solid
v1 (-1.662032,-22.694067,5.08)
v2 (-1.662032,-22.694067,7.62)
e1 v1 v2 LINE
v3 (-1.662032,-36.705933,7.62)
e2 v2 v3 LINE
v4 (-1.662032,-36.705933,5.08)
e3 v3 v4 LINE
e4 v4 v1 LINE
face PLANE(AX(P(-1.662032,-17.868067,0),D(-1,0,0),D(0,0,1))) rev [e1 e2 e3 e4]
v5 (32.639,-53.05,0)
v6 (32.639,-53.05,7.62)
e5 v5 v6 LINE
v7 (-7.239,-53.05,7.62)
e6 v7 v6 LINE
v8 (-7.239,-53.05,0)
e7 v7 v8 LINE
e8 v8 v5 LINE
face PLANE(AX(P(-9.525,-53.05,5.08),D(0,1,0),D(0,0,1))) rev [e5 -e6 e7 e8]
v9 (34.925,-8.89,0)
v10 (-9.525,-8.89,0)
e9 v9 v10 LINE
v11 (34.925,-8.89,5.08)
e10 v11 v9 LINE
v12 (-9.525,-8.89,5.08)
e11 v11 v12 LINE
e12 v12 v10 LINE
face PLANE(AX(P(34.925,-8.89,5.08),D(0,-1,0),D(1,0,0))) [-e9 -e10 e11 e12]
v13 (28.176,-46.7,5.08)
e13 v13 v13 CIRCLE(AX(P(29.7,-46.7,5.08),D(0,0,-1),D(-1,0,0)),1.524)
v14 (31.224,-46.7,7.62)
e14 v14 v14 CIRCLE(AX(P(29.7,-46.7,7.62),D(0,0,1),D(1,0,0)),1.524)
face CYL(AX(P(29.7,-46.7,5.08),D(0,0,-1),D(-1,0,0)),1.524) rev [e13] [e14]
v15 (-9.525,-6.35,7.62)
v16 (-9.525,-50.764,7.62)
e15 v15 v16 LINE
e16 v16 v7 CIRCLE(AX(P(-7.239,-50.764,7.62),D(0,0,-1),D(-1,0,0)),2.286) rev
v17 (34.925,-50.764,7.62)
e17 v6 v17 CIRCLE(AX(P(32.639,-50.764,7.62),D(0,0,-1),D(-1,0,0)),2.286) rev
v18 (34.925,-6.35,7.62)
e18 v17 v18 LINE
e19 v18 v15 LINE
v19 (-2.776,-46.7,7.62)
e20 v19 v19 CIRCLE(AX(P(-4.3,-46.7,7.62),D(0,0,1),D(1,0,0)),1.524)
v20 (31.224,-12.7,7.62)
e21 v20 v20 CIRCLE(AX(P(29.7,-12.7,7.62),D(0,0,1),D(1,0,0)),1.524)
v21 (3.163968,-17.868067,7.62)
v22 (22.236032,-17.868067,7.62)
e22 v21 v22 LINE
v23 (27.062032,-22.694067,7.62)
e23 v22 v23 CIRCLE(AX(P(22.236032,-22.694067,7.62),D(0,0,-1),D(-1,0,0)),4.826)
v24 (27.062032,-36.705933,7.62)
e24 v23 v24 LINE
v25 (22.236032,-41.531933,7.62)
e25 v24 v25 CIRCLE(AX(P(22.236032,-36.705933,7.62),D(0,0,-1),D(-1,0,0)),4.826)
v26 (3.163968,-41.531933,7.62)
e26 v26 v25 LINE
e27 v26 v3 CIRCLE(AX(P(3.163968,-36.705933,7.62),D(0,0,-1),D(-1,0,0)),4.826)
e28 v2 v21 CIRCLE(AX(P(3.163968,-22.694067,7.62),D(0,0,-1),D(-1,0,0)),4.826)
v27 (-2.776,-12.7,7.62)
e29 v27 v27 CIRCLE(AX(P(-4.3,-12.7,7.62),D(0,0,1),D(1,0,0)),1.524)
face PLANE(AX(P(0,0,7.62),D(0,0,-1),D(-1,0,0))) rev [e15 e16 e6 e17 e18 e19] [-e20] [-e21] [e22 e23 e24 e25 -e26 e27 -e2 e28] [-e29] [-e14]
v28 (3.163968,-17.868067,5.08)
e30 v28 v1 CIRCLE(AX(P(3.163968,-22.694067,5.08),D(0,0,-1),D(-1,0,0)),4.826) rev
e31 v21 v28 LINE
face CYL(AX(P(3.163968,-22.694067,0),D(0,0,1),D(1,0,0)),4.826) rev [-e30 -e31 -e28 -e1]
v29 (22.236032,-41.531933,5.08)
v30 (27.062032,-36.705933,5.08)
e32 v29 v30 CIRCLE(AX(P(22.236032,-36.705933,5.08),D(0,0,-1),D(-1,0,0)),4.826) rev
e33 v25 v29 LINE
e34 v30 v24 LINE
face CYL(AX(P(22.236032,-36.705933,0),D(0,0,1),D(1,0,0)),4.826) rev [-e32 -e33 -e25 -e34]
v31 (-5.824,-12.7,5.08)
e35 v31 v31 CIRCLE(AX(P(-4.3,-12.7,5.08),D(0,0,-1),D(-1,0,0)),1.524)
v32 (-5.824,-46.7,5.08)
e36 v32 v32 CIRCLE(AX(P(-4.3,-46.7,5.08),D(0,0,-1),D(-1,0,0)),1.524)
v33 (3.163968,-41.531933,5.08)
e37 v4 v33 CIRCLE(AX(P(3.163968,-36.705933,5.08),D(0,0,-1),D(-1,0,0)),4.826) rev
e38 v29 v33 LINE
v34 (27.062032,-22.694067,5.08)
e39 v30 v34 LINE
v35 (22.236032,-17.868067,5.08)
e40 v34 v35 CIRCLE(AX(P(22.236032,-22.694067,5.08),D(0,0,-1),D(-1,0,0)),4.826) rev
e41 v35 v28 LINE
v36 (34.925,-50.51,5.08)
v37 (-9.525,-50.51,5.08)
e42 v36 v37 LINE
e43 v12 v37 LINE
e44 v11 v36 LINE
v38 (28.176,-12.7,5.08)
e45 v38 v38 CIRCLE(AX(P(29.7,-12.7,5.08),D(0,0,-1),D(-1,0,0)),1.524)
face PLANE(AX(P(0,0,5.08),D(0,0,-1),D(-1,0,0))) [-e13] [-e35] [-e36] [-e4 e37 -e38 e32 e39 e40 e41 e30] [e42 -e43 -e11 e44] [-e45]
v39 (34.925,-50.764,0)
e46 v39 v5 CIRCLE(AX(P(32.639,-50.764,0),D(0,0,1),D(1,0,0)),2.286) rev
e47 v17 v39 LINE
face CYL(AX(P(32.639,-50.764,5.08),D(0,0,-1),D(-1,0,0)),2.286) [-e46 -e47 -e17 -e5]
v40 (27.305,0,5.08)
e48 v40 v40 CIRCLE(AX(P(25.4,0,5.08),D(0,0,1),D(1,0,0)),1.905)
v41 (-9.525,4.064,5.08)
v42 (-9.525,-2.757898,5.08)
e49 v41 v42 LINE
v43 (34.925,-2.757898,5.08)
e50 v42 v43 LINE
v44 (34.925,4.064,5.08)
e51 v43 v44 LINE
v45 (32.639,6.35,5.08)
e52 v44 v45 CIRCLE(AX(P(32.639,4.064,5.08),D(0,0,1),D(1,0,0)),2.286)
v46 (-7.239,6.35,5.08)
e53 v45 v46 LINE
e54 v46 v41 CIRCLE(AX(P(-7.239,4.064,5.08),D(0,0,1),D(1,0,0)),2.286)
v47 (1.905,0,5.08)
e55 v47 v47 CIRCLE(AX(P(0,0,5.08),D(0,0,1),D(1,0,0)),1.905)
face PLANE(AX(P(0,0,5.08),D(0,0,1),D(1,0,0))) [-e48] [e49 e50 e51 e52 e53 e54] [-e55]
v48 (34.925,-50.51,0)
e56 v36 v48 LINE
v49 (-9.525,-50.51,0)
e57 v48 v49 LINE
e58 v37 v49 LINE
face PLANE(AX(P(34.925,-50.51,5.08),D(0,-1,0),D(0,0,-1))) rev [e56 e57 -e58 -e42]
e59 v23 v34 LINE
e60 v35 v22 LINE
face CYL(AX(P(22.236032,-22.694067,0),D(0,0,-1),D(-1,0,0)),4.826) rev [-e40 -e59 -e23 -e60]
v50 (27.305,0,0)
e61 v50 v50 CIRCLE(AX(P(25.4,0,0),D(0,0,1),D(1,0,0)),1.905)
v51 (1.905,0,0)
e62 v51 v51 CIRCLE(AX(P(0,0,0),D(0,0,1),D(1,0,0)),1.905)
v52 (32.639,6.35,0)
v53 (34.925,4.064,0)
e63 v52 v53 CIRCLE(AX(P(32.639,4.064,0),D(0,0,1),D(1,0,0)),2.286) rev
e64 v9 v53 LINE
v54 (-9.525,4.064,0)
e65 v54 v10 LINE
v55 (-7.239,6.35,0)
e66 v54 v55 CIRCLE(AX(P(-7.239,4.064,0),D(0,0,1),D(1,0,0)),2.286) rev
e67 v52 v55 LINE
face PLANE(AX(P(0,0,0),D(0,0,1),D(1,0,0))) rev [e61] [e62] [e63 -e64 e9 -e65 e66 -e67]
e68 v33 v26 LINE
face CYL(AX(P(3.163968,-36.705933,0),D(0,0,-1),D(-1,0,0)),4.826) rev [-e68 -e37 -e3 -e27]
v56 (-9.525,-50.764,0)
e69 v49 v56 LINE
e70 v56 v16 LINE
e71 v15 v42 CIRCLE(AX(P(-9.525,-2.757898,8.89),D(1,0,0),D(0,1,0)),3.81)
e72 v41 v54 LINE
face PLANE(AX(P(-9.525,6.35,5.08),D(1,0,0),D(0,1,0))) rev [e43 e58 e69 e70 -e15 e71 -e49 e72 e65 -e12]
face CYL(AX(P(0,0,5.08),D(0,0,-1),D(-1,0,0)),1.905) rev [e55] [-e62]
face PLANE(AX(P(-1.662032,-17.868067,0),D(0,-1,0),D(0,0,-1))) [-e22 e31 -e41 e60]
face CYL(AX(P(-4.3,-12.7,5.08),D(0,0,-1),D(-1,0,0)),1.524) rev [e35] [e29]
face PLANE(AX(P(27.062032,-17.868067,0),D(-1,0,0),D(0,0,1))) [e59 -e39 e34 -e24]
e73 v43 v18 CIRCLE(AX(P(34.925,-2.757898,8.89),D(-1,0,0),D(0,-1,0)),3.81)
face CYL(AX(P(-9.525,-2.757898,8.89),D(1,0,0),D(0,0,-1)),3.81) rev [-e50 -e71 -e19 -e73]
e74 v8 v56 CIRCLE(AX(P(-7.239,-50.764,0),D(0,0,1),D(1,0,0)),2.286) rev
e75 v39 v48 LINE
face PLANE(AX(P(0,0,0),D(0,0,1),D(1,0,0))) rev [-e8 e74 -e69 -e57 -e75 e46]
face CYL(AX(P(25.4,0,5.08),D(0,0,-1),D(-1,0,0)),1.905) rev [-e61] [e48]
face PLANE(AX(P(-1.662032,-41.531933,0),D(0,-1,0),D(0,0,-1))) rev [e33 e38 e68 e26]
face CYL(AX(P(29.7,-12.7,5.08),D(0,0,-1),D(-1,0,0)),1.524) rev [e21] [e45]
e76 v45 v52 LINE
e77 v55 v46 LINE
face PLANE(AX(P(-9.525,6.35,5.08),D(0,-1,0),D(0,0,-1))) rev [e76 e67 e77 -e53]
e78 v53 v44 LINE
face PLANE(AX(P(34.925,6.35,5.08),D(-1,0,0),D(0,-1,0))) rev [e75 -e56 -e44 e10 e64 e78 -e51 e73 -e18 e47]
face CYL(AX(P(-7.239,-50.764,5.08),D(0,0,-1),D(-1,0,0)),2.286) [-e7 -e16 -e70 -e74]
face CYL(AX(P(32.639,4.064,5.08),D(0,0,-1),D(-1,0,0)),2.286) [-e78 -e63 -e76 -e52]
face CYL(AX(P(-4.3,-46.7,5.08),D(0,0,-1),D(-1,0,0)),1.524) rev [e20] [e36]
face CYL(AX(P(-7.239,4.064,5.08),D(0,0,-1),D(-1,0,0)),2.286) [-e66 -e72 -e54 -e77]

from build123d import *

# Parameters (mm, degrees)
SKETCH1_W           = 44.45
SKETCH1_H           = 59.4
SKETCH1_R           = 1.905
SKETCH1_R_2         = 1.524
BOSS_EXTRUDE1_DEPTH = 5.08
SKETCH2_W           = 44.45
SKETCH2_H           = 46.7
SKETCH2_R           = 1.524
BOSS_EXTRUDE2_DEPTH = 2.54
SKETCH3_W           = 44.45
SKETCH3_H           = 41.62
CUT_EXTRUDE1_DEPTH  = 5.08
FILLET2_R           = 2.286
SKETCH4_W           = 28.72406321
SKETCH4_H           = 23.663865546
CUT_EXTRUDE2_DEPTH  = 64.969700054
FILLET3_R           = 4.826
FILLET4_R           = 3.81


with BuildPart() as part:
    # Sketch1 → Boss-Extrude1 (new body)
    with BuildSketch(Plane.XY):
        with Locations((12.7, -23.35)):
            Rectangle(SKETCH1_W, SKETCH1_H)
        Circle(SKETCH1_R, mode=Mode.SUBTRACT)
        with Locations((25.4, 0)):
            Circle(SKETCH1_R, mode=Mode.SUBTRACT)
        with Locations((-4.3, -12.7)):
            Circle(SKETCH1_R_2, mode=Mode.SUBTRACT)
        with Locations((29.7, -12.7)):
            Circle(SKETCH1_R_2, mode=Mode.SUBTRACT)
        with Locations((29.7, -46.7)):
            Circle(SKETCH1_R_2, mode=Mode.SUBTRACT)
        with Locations((-4.3, -46.7)):
            Circle(SKETCH1_R_2, mode=Mode.SUBTRACT)
    extrude(amount=BOSS_EXTRUDE1_DEPTH)

    # Sketch2 → Boss-Extrude2 (add)
    with BuildSketch(Plane.XY.offset(5.08)):
        with Locations((12.7, -29.7)):
            Rectangle(SKETCH2_W, SKETCH2_H)
        with Locations((-4.3, -12.7)):
            Circle(SKETCH2_R, mode=Mode.SUBTRACT)
        with Locations((-4.3, -46.7)):
            Circle(SKETCH2_R, mode=Mode.SUBTRACT)
        with Locations((29.7, -12.7)):
            Circle(SKETCH2_R, mode=Mode.SUBTRACT)
        with Locations((29.7, -46.7)):
            Circle(SKETCH2_R, mode=Mode.SUBTRACT)
    extrude(amount=BOSS_EXTRUDE2_DEPTH)

    # Sketch3 → Cut-Extrude1 (cut)
    with BuildSketch(Plane(origin=(0, 0, 0), x_dir=(-1, 0, 0), z_dir=(0, 0, -1))):
        with Locations((-12.7, -29.7)):
            Rectangle(SKETCH3_W, SKETCH3_H)
    extrude(amount=-CUT_EXTRUDE1_DEPTH, mode=Mode.SUBTRACT)

    # Fillet2
    fillet2_edges = [part.edges().sort_by_distance(p)[0] for p in [
        (-9.525, 6.35, 2.54),
        (34.925, 6.35, 2.54),
        (34.925, -53.05, 3.81),
        (-9.525, -53.05, 3.81),
    ]]
    fillet(fillet2_edges, radius=FILLET2_R)

    # Sketch4 → Cut-Extrude2 (cut, through all)
    with BuildSketch(Plane.XY.offset(7.62)):
        with Locations((12.7, -29.7)):
            Rectangle(SKETCH4_W, SKETCH4_H)
    extrude(amount=-CUT_EXTRUDE2_DEPTH, mode=Mode.SUBTRACT)

    # Fillet3
    fillet3_edges = [part.edges().sort_by_distance(p)[0] for p in [
        (-1.662031605, -41.531932773, 6.35),
        (-1.662031605, -17.868067227, 6.35),
        (27.062031605, -17.868067227, 6.35),
        (27.062031605, -41.531932773, 6.35),
    ]]
    fillet(fillet3_edges, radius=FILLET3_R)

    # Fillet4
    # the kernel refuses this fillet: 3.81 mm, written as the material it adds along each edge
    with BuildSketch(Plane(origin=(34.925, -6.35, 5.08), x_dir=(0, 0, 1), z_dir=(-1, 0, 0))) as fillet4_piece_1:
        with BuildLine():
            CenterArc((3.81, 3.592102448), FILLET4_R, 180, 70.528779366)
            Line((0, 3.592102448), (-0.0762, 3.592102448))
            Line((-0.0762, 3.592102448), (-0.0762, 0))
            Line((-0.0762, 0), (0, -0.0762))
            ThreePointArc((0, -0.0762), (1.27, -0.0762), (2.5146, -0.071842049))
            Line((2.5146, -0.071842049), (2.54, 0))
        make_face()
    extrude(amount=44.45)


solid = part.part
